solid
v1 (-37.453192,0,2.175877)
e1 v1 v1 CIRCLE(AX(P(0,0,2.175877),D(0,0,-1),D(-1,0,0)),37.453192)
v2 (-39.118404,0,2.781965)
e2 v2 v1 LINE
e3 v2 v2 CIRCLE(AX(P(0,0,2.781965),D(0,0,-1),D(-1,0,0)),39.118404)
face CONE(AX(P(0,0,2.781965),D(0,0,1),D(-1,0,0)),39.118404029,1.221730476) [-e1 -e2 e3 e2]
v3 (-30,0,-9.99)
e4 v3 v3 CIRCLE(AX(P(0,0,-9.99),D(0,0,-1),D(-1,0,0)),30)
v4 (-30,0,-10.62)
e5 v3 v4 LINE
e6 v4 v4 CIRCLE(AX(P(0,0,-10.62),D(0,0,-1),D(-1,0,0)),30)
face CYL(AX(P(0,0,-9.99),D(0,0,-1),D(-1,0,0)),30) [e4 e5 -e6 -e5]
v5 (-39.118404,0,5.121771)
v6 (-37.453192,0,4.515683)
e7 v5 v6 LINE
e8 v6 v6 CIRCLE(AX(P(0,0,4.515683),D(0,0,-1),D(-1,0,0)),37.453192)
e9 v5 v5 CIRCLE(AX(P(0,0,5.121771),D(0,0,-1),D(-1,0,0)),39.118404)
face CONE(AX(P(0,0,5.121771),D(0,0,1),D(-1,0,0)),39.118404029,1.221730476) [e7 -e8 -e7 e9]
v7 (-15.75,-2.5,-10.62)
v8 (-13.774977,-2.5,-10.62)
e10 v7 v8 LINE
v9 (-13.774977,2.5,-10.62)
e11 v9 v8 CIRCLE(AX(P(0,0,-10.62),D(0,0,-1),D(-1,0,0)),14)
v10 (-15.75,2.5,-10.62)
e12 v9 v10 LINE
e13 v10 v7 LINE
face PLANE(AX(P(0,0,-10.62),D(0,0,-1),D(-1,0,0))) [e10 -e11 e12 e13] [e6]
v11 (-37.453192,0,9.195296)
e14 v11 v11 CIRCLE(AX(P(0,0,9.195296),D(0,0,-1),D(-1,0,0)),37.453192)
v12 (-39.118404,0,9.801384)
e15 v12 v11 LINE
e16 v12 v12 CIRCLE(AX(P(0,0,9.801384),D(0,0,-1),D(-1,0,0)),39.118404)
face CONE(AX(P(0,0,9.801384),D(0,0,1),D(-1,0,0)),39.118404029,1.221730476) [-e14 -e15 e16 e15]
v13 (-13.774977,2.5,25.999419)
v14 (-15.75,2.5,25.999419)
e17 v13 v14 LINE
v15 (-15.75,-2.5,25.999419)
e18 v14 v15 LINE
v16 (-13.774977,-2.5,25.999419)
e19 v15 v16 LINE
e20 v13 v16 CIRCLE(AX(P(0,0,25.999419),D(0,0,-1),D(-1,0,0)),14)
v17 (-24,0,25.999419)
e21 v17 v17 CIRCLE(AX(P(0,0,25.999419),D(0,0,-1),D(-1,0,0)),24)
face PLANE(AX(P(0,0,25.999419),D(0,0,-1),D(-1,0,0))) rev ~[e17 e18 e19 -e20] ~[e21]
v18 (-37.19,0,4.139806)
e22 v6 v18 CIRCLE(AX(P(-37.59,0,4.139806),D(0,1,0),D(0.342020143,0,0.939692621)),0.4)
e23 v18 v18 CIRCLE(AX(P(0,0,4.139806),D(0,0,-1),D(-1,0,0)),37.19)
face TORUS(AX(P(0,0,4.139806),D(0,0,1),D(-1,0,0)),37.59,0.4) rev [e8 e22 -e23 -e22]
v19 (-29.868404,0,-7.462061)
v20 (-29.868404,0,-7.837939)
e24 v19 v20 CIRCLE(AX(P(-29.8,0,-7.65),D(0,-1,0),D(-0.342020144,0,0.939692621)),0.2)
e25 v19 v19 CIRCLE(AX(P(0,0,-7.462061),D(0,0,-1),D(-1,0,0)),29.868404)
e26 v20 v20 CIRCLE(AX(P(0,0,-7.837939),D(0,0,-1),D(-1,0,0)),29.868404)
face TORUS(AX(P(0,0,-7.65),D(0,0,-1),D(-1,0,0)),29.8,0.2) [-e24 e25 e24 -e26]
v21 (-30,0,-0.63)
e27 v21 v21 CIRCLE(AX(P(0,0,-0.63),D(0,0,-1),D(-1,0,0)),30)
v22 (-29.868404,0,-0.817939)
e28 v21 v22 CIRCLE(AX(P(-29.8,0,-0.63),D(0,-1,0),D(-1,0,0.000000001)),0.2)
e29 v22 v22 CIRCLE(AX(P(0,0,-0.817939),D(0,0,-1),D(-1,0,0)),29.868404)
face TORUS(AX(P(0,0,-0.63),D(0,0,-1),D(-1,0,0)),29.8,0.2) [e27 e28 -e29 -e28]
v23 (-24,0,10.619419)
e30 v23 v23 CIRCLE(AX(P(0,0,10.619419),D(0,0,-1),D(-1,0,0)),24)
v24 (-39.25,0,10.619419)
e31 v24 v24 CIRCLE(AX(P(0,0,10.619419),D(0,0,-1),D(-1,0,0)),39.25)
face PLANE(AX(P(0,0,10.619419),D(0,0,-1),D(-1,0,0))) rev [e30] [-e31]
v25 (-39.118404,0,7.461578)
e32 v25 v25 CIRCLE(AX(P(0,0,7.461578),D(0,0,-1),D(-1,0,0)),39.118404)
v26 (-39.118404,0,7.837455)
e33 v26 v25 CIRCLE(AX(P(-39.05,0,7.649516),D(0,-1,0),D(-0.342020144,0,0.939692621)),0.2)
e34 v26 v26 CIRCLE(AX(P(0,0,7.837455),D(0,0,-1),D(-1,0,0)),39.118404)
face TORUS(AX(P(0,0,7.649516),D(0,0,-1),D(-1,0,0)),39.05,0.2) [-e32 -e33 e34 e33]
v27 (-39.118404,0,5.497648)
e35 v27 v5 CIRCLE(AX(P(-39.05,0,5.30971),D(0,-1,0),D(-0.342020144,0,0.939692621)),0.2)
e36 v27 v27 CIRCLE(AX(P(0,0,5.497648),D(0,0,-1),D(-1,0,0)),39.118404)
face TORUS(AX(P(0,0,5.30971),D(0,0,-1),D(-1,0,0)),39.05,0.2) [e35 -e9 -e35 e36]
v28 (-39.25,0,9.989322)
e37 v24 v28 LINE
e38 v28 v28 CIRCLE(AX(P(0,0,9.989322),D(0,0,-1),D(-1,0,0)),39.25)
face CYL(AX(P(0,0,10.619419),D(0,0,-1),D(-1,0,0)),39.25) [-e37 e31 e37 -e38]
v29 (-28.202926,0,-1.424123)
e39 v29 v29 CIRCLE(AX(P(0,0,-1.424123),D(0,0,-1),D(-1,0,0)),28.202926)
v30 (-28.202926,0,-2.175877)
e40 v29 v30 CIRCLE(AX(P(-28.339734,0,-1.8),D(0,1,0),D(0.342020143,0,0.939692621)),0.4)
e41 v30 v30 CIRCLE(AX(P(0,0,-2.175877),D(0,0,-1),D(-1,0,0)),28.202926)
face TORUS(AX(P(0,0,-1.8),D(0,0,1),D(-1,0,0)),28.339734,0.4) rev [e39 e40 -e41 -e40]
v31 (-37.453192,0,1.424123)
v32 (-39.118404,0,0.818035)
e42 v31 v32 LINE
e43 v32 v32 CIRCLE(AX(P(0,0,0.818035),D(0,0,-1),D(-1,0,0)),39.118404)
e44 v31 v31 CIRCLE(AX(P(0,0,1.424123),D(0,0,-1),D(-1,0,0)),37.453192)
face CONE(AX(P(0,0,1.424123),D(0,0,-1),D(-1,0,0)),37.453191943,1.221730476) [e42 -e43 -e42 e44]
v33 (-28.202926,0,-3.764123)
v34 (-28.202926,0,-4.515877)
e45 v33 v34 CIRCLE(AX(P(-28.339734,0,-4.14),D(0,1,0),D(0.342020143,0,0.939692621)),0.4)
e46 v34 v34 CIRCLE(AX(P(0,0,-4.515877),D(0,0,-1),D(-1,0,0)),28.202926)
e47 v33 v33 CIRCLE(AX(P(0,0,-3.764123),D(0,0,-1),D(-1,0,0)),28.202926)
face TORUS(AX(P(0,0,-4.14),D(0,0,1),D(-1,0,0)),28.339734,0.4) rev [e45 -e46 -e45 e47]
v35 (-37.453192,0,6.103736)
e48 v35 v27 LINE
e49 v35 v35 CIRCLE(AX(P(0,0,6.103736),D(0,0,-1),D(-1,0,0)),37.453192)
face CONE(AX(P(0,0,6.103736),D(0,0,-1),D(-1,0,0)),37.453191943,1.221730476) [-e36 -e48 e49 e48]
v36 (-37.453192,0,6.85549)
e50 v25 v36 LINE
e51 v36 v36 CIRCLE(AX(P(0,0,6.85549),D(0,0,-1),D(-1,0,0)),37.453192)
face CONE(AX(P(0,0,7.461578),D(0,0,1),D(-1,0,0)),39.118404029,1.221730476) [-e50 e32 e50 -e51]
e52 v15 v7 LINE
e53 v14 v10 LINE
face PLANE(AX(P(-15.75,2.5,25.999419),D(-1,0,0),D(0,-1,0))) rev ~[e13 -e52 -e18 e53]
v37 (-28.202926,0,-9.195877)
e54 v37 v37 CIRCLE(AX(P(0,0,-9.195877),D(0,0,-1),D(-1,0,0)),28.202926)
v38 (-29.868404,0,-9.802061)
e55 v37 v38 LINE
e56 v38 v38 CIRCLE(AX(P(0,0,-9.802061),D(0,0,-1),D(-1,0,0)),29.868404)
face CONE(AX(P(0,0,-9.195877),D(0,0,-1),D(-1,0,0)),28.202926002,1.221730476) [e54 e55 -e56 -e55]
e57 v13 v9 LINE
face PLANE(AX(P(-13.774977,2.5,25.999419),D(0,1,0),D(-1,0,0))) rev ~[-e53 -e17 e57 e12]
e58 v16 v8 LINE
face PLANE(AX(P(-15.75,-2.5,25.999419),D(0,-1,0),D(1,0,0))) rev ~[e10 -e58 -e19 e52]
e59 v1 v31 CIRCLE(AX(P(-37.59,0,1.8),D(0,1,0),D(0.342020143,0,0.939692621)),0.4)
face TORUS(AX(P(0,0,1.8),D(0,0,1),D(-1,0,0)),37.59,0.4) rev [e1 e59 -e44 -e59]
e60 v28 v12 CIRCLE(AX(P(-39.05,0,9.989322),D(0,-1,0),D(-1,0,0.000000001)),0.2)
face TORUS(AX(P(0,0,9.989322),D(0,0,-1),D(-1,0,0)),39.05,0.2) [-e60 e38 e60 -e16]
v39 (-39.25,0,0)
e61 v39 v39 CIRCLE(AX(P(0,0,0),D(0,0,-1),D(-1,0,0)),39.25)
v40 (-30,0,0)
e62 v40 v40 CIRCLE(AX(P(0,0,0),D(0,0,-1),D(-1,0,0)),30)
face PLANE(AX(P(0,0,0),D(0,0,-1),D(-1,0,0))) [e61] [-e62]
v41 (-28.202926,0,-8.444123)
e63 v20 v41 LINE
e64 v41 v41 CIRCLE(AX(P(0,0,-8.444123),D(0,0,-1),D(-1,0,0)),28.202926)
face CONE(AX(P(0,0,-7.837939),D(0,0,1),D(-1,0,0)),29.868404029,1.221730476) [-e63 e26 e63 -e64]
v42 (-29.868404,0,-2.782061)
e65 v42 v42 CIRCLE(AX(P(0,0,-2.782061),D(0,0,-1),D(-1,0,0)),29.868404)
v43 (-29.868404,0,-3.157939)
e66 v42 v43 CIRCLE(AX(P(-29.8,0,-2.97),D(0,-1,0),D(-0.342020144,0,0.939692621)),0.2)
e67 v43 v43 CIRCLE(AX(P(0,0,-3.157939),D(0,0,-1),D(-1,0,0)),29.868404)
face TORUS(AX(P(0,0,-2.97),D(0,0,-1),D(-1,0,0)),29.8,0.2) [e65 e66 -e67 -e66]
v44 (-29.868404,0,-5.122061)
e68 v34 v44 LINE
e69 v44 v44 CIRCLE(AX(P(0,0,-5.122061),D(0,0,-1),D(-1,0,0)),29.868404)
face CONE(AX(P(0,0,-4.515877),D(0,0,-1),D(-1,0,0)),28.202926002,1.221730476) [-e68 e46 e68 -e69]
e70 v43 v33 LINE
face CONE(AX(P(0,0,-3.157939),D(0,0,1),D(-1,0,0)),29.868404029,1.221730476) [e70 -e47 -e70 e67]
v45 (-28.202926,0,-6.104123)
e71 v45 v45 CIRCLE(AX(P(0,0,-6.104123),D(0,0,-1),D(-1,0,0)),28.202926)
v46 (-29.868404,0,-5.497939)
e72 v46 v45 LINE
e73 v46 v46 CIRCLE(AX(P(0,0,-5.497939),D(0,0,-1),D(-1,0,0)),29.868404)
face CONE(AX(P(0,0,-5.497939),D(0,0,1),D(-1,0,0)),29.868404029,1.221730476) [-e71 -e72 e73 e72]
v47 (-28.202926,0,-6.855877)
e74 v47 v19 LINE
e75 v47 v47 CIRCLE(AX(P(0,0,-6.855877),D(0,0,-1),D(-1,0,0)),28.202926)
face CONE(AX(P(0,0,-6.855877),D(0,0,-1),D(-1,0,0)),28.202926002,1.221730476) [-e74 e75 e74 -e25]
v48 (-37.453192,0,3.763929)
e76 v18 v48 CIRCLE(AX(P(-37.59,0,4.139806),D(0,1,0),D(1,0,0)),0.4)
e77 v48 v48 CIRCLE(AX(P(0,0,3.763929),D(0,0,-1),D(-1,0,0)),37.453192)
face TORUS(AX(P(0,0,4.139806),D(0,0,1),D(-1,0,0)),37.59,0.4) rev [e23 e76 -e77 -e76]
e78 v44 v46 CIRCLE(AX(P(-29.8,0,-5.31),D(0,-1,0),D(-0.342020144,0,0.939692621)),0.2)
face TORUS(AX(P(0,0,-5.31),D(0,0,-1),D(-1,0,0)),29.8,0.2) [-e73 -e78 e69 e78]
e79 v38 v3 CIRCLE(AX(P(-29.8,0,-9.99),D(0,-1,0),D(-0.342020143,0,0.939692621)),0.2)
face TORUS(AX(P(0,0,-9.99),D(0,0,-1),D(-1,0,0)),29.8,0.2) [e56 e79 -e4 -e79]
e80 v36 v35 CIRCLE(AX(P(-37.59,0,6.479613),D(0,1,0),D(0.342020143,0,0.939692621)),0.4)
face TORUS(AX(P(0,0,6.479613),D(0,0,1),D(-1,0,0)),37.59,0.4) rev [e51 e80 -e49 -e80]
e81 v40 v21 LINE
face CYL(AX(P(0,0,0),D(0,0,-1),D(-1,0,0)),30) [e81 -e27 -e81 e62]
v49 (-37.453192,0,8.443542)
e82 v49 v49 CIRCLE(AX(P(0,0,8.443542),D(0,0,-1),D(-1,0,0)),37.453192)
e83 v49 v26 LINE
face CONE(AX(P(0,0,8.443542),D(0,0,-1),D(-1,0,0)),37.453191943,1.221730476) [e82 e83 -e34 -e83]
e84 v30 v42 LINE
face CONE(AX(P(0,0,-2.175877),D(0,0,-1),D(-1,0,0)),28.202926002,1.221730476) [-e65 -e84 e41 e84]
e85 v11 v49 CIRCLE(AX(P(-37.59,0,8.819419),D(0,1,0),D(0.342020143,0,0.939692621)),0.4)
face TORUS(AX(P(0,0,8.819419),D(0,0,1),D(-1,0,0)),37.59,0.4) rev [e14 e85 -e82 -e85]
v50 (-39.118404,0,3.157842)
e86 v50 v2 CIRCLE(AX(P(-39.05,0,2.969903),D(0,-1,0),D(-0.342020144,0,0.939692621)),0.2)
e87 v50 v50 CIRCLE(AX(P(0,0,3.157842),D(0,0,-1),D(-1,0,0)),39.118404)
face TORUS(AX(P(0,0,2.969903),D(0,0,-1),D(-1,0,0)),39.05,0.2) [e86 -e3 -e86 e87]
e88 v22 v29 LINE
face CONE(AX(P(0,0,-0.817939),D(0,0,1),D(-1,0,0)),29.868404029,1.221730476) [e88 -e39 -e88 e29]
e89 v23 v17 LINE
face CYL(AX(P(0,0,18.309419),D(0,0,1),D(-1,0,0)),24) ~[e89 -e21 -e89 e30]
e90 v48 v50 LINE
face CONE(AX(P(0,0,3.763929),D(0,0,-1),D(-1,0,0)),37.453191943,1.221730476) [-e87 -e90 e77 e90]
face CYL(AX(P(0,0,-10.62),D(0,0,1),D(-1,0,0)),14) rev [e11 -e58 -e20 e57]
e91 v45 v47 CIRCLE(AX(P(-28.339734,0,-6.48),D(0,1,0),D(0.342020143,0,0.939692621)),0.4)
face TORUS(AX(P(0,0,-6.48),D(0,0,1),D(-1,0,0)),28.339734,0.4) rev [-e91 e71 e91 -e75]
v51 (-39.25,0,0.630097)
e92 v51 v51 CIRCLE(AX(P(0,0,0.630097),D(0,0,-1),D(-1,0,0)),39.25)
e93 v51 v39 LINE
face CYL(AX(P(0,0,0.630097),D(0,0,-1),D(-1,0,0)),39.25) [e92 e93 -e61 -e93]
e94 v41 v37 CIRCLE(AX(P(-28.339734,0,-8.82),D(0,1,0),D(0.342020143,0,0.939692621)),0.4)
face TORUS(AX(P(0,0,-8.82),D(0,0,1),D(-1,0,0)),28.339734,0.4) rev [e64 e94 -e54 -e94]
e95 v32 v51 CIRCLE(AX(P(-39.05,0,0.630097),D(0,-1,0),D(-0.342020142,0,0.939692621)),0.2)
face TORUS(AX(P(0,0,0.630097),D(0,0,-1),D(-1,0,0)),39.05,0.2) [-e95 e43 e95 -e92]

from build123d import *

# Parameters (mm, degrees)
F0_W     = 10
F0_H     = 15.38
F3_DEPTH = 36.6194192331


# Not quite as in the source:
# - a feature names something its author has since deleted; it is built from what else it names


with BuildPart() as f1:
    # F0 (on Front) → F1 (revolve)
    with BuildSketch(Plane.XZ):
        with BuildLine():
            Line((-30, 0), (-14, 0))
            Line((-14, 0), (-14, 10.6194192331))
            Line((-14, 10.6194192331), (-24, 10.6194192331))
            Line((-24, 10.6194192331), (-39.25, 10.6194192331))
            Line((-39.25, 10.6194192331), (-39.25, 9.9893224386))
            ThreePointArc((-39.25, 9.9893224386), (-39.2138304089, 9.8746071513), (-39.1184040287, 9.8013839144))
            Line((-39.1184040287, 9.8013839144), (-37.4531919427, 9.1952962814))
            ThreePointArc((-37.4531919427, 9.1952962814), (-37.19, 8.8194192331), (-37.4531919427, 8.4435421848))
            Line((-37.4531919427, 8.4435421848), (-39.1184040287, 7.8374545517))
            ThreePointArc((-39.1184040287, 7.8374545517), (-39.25, 7.6495160276), (-39.1184040287, 7.4615775034))
            Line((-39.1184040287, 7.4615775034), (-37.4531919427, 6.8554898704))
            ThreePointArc((-37.4531919427, 6.8554898704), (-37.19, 6.4796128221), (-37.4531919427, 6.1037357737))
            Line((-37.4531919427, 6.1037357737), (-39.1184040287, 5.4976481407))
            ThreePointArc((-39.1184040287, 5.4976481407), (-39.25, 5.3097096165), (-39.1184040287, 5.1217710924))
            Line((-39.1184040287, 5.1217710924), (-37.4531919427, 4.5156834593))
            ThreePointArc((-37.4531919427, 4.5156834593), (-37.2623391823, 4.3692369856), (-37.19, 4.139806411))
            ThreePointArc((-37.19, 4.139806411), (-37.2623391823, 3.9103758365), (-37.4531919427, 3.7639293627))
            Line((-37.4531919427, 3.7639293627), (-39.1184040287, 3.1578417297))
            ThreePointArc((-39.1184040287, 3.1578417297), (-39.25, 2.9699032055), (-39.1184040287, 2.7819646814))
            Line((-39.1184040287, 2.7819646814), (-37.4531919427, 2.1758770483))
            ThreePointArc((-37.4531919427, 2.1758770483), (-37.19, 1.8), (-37.4531919427, 1.4241229517))
            Line((-37.4531919427, 1.4241229517), (-39.1184040287, 0.8180353186))
            ThreePointArc((-39.1184040287, 0.8180353186), (-39.2138304089, 0.7448120818), (-39.25, 0.6300967945))
            Line((-39.25, 0.6300967945), (-39.25, 0))
            Line((-39.25, 0), (-30, 0))
        make_face()
        with Locations((-19, 18.3094192331)):
            Rectangle(F0_W, F0_H)
        with BuildLine():
            Line((-14, -10.62), (-14, 0))
            Line((-14, 0), (-30, 0))
            Line((-30, 0), (-30, -0.63))
            ThreePointArc((-30, -0.63), (-29.9638304089, -0.7447152873), (-29.8684040287, -0.8179385242))
            Line((-29.8684040287, -0.8179385242), (-28.202926002, -1.4241229517))
            ThreePointArc((-28.202926002, -1.4241229517), (-27.9397340593, -1.8), (-28.202926002, -2.1758770483))
            Line((-28.202926002, -2.1758770483), (-29.8684040287, -2.7820614758))
            ThreePointArc((-29.8684040287, -2.7820614758), (-30, -2.97), (-29.8684040287, -3.1579385242))
            Line((-29.8684040287, -3.1579385242), (-28.202926002, -3.7641229517))
            ThreePointArc((-28.202926002, -3.7641229517), (-27.9397340593, -4.14), (-28.202926002, -4.5158770483))
            Line((-28.202926002, -4.5158770483), (-29.8684040287, -5.1220614758))
            ThreePointArc((-29.8684040287, -5.1220614758), (-30, -5.31), (-29.8684040287, -5.4979385242))
            Line((-29.8684040287, -5.4979385242), (-28.202926002, -6.1041229517))
            ThreePointArc((-28.202926002, -6.1041229517), (-27.9397340593, -6.48), (-28.202926002, -6.8558770483))
            Line((-28.202926002, -6.8558770483), (-29.8684040287, -7.4620614758))
            ThreePointArc((-29.8684040287, -7.4620614758), (-30, -7.65), (-29.8684040287, -7.8379385242))
            Line((-29.8684040287, -7.8379385242), (-28.202926002, -8.4441229517))
            ThreePointArc((-28.202926002, -8.4441229517), (-27.9397340593, -8.82), (-28.202926002, -9.1958770483))
            Line((-28.202926002, -9.1958770483), (-29.8684040287, -9.8020614758))
            ThreePointArc((-29.8684040287, -9.8020614758), (-29.9638304089, -9.8752847127), (-30, -9.99))
            Line((-30, -9.99), (-30, -10.62))
            Line((-30, -10.62), (-14, -10.62))
        make_face()
    revolve(axis=Axis((0, 0, 5.3097096165), (0, 0, -1)))

    # F2 (on face) → F3 (cut, through all)
    with BuildSketch(Plane.XY.offset(25.9994192331)):
        with BuildLine():
            Line((-15.75, -2.5), (-13.774977314, -2.5))
            ThreePointArc((-13.774977314, -2.5), (-13.943630847, -1.2550533066), (-14, 0))
            Line((-14, 0), (-15.75, 0))
            Line((-15.75, 0), (-15.75, -2.5))
        make_face()
        with BuildLine():
            ThreePointArc((-14, 0), (-13.943630847, 1.2550533066), (-13.774977314, 2.5))
            Line((-13.774977314, 2.5), (-15.75, 2.5))
            Line((-15.75, 2.5), (-15.75, 0))
            Line((-15.75, 0), (-14, 0))
        make_face()
    extrude(amount=-F3_DEPTH, mode=Mode.SUBTRACT)


solid = f1.part
